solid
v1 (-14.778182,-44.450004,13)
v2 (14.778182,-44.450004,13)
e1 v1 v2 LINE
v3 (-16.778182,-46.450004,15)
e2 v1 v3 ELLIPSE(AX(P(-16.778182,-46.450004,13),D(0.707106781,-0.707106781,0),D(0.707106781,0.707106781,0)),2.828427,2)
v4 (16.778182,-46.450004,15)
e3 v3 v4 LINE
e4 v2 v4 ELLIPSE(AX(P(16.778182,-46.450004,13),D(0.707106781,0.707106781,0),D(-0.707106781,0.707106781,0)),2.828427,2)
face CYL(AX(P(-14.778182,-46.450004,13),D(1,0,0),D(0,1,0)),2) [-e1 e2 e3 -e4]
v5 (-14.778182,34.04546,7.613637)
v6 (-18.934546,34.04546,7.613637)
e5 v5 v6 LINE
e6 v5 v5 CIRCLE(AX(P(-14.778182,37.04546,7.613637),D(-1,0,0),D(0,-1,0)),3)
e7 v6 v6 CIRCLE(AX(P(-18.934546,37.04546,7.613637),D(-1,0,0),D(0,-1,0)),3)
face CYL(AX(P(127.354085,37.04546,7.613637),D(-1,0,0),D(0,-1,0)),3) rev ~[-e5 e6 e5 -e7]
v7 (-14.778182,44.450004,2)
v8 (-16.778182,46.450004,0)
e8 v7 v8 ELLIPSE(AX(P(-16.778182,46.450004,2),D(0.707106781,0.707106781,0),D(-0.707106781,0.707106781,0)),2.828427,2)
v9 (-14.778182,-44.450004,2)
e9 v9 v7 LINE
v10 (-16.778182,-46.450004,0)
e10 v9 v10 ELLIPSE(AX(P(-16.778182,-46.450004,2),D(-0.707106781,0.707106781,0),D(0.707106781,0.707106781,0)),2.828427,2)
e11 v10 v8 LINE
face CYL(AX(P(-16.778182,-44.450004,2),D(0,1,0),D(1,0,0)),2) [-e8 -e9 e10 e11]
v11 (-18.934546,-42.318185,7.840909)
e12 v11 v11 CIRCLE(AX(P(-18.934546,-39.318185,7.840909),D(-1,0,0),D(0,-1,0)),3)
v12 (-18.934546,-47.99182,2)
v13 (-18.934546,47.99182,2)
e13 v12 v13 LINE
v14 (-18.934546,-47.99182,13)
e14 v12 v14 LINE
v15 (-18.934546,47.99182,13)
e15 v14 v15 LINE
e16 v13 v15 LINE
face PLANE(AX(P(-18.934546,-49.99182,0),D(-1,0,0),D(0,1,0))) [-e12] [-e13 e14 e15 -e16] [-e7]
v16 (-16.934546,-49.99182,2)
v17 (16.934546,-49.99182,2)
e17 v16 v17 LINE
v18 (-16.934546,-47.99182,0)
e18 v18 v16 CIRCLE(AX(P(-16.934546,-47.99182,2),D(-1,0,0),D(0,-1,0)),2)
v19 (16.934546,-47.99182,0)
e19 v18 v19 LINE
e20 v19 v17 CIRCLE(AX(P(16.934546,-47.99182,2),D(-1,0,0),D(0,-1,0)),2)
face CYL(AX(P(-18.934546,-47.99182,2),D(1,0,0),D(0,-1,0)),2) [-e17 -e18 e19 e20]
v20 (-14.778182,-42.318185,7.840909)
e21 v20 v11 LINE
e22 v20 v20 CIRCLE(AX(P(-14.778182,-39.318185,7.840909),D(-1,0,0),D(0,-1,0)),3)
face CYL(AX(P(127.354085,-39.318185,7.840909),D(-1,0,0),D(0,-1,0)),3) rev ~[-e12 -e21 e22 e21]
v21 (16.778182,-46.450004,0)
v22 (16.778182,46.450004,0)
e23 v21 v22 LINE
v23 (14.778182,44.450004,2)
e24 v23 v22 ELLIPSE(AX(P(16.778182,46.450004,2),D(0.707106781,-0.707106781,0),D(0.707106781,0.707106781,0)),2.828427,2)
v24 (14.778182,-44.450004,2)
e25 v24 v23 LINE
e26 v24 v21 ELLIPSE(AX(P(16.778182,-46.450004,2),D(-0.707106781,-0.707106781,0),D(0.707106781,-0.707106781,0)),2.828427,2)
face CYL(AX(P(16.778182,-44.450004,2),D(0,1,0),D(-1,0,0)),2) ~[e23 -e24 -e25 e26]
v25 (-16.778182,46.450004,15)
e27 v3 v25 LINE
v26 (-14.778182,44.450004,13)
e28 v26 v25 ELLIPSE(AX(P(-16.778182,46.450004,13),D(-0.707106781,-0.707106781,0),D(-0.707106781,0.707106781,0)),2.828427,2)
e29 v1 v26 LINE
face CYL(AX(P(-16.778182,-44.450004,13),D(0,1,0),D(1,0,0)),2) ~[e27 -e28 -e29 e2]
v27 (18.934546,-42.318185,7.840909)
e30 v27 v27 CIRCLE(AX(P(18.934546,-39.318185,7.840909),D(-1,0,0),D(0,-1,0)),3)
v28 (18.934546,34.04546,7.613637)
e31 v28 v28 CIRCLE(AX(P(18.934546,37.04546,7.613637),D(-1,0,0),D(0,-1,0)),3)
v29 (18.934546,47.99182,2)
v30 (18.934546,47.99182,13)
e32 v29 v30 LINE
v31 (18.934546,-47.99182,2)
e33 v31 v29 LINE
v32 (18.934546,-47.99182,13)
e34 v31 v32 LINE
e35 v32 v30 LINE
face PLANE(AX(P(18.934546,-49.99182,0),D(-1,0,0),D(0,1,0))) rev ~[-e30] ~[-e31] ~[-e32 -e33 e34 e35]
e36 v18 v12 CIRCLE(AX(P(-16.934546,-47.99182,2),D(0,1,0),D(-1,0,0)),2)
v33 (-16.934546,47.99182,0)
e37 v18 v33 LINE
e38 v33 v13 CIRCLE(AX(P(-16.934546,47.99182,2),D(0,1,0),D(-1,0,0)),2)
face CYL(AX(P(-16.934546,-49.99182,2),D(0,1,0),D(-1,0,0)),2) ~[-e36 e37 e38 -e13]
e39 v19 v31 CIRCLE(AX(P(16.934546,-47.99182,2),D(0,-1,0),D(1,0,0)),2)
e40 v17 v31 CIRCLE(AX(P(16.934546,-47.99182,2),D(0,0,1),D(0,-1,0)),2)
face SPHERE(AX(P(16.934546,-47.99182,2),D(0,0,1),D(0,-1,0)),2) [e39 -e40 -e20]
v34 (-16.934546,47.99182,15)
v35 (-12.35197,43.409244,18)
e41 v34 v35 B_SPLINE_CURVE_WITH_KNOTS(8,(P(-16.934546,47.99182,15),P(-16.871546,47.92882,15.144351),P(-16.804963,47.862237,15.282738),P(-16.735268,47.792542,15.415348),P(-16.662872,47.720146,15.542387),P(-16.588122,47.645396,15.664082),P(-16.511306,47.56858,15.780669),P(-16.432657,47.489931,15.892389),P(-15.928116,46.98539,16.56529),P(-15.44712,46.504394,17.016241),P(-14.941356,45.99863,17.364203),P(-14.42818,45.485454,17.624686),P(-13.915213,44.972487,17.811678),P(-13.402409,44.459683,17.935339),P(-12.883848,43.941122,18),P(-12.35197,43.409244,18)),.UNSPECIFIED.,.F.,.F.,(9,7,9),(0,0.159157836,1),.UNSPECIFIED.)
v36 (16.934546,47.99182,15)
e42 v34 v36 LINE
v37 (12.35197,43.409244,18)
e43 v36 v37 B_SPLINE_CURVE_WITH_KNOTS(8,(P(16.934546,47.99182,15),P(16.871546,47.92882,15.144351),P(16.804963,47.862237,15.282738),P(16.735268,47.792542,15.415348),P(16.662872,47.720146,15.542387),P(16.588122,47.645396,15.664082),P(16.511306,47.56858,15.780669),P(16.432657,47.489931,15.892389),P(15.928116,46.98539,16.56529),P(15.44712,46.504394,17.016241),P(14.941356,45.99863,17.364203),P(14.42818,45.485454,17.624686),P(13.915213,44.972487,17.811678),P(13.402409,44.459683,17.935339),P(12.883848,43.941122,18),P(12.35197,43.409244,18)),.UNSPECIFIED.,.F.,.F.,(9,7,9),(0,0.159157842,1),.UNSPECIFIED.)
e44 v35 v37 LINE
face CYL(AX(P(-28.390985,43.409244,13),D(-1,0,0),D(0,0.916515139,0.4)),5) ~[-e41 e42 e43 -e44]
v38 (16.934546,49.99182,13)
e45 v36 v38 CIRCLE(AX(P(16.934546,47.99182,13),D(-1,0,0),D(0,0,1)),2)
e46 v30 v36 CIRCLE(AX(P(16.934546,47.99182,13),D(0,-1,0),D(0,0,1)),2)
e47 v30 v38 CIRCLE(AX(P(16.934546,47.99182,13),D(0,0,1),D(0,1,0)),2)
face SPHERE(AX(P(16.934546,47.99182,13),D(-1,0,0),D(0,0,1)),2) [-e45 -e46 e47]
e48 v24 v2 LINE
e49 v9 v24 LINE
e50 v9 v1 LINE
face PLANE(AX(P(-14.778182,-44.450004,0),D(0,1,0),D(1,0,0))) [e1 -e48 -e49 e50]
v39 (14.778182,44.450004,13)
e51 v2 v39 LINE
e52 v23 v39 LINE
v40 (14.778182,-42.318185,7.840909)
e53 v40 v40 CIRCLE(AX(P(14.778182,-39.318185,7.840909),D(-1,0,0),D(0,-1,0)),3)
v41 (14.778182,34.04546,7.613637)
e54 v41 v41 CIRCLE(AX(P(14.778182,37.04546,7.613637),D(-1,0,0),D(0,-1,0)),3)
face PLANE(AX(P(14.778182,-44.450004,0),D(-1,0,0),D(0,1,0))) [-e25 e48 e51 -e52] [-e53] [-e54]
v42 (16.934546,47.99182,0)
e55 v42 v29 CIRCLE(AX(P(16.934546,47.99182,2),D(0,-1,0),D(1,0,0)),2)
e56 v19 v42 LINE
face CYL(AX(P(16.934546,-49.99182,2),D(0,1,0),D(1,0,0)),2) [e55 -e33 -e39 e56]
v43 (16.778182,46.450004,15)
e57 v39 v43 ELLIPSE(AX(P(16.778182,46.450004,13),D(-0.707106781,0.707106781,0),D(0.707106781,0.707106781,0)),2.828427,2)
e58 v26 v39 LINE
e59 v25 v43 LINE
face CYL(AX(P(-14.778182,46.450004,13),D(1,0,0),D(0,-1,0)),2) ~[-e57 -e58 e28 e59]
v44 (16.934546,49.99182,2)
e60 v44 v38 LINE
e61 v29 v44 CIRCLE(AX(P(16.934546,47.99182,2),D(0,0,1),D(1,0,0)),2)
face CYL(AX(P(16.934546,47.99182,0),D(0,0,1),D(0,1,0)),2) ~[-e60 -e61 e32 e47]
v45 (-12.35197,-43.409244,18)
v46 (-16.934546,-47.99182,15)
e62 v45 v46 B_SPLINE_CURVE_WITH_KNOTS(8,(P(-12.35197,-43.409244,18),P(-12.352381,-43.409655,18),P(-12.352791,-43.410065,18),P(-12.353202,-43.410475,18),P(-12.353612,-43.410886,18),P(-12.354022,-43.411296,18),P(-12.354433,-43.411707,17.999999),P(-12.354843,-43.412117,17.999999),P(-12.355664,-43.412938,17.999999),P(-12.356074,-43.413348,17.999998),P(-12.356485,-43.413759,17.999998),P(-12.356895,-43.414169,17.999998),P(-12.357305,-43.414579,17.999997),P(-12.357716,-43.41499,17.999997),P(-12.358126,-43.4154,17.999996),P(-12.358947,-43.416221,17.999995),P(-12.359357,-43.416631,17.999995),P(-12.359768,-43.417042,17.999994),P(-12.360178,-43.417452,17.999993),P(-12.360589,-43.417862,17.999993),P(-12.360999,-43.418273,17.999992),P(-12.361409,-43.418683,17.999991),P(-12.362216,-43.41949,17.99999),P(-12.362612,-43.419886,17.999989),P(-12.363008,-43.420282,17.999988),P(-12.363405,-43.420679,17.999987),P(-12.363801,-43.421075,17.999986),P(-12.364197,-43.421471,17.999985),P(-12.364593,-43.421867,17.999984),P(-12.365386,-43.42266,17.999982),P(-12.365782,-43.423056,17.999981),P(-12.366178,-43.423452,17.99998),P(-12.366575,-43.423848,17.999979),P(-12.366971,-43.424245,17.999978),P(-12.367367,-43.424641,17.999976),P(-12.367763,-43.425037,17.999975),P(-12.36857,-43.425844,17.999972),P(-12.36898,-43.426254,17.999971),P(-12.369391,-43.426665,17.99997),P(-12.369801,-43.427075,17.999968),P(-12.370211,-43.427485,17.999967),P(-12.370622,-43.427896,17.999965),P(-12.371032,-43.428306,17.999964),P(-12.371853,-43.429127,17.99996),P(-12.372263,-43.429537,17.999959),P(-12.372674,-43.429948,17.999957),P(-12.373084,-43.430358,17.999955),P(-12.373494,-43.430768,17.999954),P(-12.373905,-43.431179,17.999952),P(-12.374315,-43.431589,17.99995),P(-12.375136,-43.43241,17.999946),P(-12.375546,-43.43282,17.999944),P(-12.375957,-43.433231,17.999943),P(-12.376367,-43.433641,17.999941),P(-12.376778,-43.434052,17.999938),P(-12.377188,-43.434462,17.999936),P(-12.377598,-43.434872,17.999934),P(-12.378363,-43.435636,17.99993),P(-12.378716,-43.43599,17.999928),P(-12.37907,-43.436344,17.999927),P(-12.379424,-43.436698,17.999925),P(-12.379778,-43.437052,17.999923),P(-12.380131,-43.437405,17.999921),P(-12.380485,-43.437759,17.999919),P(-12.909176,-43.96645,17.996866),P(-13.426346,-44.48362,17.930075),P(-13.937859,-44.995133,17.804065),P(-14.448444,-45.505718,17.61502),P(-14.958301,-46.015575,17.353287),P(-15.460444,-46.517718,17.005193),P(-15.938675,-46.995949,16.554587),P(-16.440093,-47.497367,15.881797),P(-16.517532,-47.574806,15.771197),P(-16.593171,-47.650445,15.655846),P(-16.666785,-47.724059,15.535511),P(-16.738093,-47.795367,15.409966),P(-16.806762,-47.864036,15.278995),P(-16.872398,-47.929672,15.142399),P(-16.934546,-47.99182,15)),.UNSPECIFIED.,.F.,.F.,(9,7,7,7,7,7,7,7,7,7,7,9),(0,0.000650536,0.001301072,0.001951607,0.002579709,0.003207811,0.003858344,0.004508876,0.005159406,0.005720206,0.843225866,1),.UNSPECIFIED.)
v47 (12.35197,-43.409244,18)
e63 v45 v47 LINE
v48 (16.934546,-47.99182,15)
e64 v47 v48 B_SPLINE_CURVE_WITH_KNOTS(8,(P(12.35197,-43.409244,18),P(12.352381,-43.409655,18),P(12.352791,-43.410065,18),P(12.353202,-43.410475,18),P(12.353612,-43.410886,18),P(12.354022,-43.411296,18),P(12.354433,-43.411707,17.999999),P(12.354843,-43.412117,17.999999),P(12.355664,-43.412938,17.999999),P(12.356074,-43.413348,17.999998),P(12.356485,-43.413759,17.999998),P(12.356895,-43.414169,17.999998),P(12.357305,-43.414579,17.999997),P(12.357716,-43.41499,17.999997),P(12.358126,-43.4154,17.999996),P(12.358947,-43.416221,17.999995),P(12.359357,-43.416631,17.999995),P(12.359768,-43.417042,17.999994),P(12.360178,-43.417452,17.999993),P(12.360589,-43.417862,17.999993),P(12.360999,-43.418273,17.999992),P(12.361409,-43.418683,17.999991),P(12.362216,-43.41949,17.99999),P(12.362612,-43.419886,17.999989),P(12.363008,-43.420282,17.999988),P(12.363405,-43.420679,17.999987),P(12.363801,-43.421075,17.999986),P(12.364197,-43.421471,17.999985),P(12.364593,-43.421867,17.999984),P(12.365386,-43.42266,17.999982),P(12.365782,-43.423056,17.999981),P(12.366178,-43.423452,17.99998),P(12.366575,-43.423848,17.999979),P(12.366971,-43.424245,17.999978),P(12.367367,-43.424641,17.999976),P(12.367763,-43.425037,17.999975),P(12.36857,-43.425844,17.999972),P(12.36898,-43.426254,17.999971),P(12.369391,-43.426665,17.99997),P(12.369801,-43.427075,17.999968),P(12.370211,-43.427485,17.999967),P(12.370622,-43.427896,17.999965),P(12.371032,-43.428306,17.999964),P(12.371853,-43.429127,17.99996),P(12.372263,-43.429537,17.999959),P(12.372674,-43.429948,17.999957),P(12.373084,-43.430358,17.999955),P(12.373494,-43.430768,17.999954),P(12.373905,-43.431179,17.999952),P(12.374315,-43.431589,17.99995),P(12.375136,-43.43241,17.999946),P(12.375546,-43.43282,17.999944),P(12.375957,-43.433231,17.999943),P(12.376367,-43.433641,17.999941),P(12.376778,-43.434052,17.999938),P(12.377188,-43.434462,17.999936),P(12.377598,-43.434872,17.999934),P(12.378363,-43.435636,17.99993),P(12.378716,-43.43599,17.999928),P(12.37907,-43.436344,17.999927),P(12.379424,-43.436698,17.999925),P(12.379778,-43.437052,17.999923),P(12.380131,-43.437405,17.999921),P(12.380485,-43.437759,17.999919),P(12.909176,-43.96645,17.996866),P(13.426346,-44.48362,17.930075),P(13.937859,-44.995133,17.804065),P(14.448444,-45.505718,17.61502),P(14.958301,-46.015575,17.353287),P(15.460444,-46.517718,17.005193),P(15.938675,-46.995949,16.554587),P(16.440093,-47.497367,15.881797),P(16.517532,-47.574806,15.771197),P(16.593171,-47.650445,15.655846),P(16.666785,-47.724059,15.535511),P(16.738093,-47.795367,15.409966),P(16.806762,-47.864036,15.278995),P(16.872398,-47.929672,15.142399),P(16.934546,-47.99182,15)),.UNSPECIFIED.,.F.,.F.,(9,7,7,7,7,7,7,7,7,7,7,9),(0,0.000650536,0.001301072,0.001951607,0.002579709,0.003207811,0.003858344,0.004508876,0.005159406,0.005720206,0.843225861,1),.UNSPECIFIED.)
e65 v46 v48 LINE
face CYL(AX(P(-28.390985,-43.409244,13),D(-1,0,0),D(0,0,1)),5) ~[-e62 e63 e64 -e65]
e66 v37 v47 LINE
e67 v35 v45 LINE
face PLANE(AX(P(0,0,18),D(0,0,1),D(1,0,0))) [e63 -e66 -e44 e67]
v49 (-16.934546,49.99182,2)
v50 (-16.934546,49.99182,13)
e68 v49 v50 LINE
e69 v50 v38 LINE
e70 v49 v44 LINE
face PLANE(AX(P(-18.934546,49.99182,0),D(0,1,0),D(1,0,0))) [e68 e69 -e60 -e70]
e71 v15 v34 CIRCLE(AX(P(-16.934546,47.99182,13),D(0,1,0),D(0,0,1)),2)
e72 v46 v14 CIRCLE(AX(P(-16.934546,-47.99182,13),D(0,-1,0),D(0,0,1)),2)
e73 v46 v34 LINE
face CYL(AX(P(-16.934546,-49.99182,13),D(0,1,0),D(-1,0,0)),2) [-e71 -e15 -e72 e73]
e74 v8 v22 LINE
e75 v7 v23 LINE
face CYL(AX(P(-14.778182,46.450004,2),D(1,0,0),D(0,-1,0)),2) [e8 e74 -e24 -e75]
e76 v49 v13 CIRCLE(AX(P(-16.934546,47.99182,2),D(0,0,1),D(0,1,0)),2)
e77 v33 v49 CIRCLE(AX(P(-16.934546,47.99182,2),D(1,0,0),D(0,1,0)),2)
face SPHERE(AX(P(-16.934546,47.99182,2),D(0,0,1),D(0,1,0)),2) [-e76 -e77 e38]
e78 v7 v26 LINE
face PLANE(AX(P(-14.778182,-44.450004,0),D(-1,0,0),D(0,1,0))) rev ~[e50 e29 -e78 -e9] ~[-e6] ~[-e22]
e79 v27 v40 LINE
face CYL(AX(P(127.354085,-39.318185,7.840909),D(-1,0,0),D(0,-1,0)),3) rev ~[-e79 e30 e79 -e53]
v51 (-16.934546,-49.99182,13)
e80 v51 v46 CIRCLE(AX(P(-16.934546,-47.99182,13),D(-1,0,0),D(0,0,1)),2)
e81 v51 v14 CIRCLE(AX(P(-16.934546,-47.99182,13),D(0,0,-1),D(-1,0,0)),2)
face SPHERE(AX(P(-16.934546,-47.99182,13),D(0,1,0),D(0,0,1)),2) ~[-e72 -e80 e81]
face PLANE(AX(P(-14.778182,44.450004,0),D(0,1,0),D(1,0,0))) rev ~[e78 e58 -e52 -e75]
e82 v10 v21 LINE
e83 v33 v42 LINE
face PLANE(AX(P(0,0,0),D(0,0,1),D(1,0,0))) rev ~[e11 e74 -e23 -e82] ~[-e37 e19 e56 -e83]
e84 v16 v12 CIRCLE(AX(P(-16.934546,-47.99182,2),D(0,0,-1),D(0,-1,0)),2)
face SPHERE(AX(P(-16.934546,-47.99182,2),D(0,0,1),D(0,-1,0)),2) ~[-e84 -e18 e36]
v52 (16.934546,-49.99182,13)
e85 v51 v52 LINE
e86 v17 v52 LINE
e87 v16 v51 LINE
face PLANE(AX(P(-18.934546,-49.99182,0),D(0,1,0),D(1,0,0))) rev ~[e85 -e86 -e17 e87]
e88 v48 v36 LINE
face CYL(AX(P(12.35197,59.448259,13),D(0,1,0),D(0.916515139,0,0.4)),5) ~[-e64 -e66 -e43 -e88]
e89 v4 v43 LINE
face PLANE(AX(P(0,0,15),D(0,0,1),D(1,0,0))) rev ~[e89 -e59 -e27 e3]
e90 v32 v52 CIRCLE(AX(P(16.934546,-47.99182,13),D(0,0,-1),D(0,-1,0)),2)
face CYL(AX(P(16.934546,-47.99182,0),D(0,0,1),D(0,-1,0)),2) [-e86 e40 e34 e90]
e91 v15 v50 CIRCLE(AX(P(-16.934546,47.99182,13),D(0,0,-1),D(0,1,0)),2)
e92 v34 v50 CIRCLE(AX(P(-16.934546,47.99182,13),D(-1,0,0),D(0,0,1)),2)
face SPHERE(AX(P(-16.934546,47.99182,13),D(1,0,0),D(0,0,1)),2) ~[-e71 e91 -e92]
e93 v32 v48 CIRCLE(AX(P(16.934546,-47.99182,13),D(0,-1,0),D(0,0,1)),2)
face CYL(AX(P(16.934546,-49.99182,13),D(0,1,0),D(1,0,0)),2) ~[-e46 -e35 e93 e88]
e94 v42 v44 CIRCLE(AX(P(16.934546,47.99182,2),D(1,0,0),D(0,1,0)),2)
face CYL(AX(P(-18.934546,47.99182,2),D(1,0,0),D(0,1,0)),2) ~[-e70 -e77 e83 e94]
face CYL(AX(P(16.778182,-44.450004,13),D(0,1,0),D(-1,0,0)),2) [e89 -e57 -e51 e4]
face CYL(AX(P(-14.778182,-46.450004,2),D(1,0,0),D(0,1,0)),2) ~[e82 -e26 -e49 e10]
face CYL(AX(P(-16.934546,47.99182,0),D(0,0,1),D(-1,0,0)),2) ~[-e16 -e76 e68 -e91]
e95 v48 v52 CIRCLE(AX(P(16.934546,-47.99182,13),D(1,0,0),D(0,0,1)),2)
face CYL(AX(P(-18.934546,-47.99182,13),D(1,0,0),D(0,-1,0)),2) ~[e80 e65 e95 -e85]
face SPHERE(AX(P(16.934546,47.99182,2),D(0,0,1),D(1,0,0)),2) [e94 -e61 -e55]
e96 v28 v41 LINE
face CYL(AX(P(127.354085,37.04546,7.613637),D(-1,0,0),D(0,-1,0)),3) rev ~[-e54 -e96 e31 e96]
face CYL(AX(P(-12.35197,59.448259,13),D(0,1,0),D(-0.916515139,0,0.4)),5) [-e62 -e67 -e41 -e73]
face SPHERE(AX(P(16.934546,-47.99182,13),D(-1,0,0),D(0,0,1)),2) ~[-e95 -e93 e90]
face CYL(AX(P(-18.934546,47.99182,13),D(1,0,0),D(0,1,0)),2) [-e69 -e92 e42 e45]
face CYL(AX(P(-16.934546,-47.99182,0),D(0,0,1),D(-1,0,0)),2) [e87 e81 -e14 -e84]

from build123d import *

# Parameters (mm, degrees)
F0_W        = 37.869092077
F0_H        = 99.9836400151
F0_W_2      = 29.556363821
F0_H_2      = 88.9000073075
F1_DEPTH    = 15
F2_R        = 2
F3_W        = 33.869092077
F3_H        = 95.9836400151
F4_DEPTH    = 3
F6_D        = 6
F7_T1_DEPTH = 56.7819705518
F7_T3_DEPTH = 118.8965184899


# Not quite as in the source:
# - a fillet or chamfer that OpenCascade refuses, or shapes differently, is made with other operations: its cross-section is extruded or revolved along the edge and cut away or added


with BuildPart() as f1:
    # F0 (on Top) → F1 (new body)
    with BuildSketch(Plane.XY):
        Rectangle(F0_W, F0_H)
        Rectangle(F0_W_2, F0_H_2, mode=Mode.SUBTRACT)
    extrude(amount=F1_DEPTH)

    # F2
    f2_edges = [f1.edges().sort_by_distance(p)[0] for p in [
        (0, 49.99182, 15),
        (-18.934546, 0, 15),
        (0, -49.99182, 15),
        (18.934546, 0, 15),
        (-18.934546, 49.99182, 7.5),
        (-18.934546, -49.99182, 7.5),
        (18.934546, 49.99182, 7.5),
        (18.934546, -49.99182, 7.5),
        (14.778182, 0, 15),
        (-14.778182, 0, 15),
        (0, -44.450004, 15),
        (0, 44.450004, 15),
        (0, -44.450004, 0),
        (0, -49.99182, 0),
        (-14.778182, 0, 0),
        (18.934546, 0, 0),
        (14.778182, 0, 0),
        (0, 44.450004, 0),
        (0, 49.99182, 0),
        (-18.934546, 0, 0),
    ]]
    fillet(f2_edges, radius=F2_R)

    # F3 (on face) → F4 (join)
    with BuildSketch(Plane.XY.offset(15)):
        Rectangle(F3_W, F3_H)
    extrude(amount=F4_DEPTH)

    # F6 (through all)
    with Locations(Plane.YZ.offset(18.9345460385)):
        with Locations((-39.3181852996, 7.8409090638), (37.0454601943, 7.6136365533)):
            Hole(F6_D / 2)

    # F7: fillet of radius 5 on 4 edges, made by hand

    # F7_s2 → F7_t1 (cut)
    with BuildSketch(Plane.YZ.offset(-28.3909852759)):
        with BuildLine():
            ThreePointArc((-43.4092443126, 18), (-46.1478571001, 17.1833001327), (-47.9918200076, 15))
            Line((-47.9918200076, 15), (-47.9918200076, 18))
            Line((-47.9918200076, 18), (-43.4092443126, 18))
        make_face()
        with BuildLine():
            ThreePointArc((47.9918200076, 15), (46.1478571001, 17.1833001327), (43.4092443126, 18))
            Line((43.4092443126, 18), (47.9918200076, 18))
            Line((47.9918200076, 18), (47.9918200076, 15))
        make_face()
    extrude(amount=F7_T1_DEPTH, mode=Mode.SUBTRACT)

    # F7_s4 → F7_t3 (cut)
    with BuildSketch(Plane.XZ.offset(-59.448259245)):
        with BuildLine():
            ThreePointArc((16.9345460385, 15), (15.0905831311, 17.1833001327), (12.3519703436, 18))
            Line((12.3519703436, 18), (16.9345460385, 18))
            Line((16.9345460385, 18), (16.9345460385, 15))
        make_face()
        with BuildLine():
            ThreePointArc((-16.9345460385, 15), (-15.0905831311, 17.1833001327), (-12.3519703436, 18))
            Line((-12.3519703436, 18), (-16.9345460385, 18))
            Line((-16.9345460385, 18), (-16.9345460385, 15))
        make_face()
    extrude(amount=F7_T3_DEPTH, mode=Mode.SUBTRACT)


solid = f1.part
